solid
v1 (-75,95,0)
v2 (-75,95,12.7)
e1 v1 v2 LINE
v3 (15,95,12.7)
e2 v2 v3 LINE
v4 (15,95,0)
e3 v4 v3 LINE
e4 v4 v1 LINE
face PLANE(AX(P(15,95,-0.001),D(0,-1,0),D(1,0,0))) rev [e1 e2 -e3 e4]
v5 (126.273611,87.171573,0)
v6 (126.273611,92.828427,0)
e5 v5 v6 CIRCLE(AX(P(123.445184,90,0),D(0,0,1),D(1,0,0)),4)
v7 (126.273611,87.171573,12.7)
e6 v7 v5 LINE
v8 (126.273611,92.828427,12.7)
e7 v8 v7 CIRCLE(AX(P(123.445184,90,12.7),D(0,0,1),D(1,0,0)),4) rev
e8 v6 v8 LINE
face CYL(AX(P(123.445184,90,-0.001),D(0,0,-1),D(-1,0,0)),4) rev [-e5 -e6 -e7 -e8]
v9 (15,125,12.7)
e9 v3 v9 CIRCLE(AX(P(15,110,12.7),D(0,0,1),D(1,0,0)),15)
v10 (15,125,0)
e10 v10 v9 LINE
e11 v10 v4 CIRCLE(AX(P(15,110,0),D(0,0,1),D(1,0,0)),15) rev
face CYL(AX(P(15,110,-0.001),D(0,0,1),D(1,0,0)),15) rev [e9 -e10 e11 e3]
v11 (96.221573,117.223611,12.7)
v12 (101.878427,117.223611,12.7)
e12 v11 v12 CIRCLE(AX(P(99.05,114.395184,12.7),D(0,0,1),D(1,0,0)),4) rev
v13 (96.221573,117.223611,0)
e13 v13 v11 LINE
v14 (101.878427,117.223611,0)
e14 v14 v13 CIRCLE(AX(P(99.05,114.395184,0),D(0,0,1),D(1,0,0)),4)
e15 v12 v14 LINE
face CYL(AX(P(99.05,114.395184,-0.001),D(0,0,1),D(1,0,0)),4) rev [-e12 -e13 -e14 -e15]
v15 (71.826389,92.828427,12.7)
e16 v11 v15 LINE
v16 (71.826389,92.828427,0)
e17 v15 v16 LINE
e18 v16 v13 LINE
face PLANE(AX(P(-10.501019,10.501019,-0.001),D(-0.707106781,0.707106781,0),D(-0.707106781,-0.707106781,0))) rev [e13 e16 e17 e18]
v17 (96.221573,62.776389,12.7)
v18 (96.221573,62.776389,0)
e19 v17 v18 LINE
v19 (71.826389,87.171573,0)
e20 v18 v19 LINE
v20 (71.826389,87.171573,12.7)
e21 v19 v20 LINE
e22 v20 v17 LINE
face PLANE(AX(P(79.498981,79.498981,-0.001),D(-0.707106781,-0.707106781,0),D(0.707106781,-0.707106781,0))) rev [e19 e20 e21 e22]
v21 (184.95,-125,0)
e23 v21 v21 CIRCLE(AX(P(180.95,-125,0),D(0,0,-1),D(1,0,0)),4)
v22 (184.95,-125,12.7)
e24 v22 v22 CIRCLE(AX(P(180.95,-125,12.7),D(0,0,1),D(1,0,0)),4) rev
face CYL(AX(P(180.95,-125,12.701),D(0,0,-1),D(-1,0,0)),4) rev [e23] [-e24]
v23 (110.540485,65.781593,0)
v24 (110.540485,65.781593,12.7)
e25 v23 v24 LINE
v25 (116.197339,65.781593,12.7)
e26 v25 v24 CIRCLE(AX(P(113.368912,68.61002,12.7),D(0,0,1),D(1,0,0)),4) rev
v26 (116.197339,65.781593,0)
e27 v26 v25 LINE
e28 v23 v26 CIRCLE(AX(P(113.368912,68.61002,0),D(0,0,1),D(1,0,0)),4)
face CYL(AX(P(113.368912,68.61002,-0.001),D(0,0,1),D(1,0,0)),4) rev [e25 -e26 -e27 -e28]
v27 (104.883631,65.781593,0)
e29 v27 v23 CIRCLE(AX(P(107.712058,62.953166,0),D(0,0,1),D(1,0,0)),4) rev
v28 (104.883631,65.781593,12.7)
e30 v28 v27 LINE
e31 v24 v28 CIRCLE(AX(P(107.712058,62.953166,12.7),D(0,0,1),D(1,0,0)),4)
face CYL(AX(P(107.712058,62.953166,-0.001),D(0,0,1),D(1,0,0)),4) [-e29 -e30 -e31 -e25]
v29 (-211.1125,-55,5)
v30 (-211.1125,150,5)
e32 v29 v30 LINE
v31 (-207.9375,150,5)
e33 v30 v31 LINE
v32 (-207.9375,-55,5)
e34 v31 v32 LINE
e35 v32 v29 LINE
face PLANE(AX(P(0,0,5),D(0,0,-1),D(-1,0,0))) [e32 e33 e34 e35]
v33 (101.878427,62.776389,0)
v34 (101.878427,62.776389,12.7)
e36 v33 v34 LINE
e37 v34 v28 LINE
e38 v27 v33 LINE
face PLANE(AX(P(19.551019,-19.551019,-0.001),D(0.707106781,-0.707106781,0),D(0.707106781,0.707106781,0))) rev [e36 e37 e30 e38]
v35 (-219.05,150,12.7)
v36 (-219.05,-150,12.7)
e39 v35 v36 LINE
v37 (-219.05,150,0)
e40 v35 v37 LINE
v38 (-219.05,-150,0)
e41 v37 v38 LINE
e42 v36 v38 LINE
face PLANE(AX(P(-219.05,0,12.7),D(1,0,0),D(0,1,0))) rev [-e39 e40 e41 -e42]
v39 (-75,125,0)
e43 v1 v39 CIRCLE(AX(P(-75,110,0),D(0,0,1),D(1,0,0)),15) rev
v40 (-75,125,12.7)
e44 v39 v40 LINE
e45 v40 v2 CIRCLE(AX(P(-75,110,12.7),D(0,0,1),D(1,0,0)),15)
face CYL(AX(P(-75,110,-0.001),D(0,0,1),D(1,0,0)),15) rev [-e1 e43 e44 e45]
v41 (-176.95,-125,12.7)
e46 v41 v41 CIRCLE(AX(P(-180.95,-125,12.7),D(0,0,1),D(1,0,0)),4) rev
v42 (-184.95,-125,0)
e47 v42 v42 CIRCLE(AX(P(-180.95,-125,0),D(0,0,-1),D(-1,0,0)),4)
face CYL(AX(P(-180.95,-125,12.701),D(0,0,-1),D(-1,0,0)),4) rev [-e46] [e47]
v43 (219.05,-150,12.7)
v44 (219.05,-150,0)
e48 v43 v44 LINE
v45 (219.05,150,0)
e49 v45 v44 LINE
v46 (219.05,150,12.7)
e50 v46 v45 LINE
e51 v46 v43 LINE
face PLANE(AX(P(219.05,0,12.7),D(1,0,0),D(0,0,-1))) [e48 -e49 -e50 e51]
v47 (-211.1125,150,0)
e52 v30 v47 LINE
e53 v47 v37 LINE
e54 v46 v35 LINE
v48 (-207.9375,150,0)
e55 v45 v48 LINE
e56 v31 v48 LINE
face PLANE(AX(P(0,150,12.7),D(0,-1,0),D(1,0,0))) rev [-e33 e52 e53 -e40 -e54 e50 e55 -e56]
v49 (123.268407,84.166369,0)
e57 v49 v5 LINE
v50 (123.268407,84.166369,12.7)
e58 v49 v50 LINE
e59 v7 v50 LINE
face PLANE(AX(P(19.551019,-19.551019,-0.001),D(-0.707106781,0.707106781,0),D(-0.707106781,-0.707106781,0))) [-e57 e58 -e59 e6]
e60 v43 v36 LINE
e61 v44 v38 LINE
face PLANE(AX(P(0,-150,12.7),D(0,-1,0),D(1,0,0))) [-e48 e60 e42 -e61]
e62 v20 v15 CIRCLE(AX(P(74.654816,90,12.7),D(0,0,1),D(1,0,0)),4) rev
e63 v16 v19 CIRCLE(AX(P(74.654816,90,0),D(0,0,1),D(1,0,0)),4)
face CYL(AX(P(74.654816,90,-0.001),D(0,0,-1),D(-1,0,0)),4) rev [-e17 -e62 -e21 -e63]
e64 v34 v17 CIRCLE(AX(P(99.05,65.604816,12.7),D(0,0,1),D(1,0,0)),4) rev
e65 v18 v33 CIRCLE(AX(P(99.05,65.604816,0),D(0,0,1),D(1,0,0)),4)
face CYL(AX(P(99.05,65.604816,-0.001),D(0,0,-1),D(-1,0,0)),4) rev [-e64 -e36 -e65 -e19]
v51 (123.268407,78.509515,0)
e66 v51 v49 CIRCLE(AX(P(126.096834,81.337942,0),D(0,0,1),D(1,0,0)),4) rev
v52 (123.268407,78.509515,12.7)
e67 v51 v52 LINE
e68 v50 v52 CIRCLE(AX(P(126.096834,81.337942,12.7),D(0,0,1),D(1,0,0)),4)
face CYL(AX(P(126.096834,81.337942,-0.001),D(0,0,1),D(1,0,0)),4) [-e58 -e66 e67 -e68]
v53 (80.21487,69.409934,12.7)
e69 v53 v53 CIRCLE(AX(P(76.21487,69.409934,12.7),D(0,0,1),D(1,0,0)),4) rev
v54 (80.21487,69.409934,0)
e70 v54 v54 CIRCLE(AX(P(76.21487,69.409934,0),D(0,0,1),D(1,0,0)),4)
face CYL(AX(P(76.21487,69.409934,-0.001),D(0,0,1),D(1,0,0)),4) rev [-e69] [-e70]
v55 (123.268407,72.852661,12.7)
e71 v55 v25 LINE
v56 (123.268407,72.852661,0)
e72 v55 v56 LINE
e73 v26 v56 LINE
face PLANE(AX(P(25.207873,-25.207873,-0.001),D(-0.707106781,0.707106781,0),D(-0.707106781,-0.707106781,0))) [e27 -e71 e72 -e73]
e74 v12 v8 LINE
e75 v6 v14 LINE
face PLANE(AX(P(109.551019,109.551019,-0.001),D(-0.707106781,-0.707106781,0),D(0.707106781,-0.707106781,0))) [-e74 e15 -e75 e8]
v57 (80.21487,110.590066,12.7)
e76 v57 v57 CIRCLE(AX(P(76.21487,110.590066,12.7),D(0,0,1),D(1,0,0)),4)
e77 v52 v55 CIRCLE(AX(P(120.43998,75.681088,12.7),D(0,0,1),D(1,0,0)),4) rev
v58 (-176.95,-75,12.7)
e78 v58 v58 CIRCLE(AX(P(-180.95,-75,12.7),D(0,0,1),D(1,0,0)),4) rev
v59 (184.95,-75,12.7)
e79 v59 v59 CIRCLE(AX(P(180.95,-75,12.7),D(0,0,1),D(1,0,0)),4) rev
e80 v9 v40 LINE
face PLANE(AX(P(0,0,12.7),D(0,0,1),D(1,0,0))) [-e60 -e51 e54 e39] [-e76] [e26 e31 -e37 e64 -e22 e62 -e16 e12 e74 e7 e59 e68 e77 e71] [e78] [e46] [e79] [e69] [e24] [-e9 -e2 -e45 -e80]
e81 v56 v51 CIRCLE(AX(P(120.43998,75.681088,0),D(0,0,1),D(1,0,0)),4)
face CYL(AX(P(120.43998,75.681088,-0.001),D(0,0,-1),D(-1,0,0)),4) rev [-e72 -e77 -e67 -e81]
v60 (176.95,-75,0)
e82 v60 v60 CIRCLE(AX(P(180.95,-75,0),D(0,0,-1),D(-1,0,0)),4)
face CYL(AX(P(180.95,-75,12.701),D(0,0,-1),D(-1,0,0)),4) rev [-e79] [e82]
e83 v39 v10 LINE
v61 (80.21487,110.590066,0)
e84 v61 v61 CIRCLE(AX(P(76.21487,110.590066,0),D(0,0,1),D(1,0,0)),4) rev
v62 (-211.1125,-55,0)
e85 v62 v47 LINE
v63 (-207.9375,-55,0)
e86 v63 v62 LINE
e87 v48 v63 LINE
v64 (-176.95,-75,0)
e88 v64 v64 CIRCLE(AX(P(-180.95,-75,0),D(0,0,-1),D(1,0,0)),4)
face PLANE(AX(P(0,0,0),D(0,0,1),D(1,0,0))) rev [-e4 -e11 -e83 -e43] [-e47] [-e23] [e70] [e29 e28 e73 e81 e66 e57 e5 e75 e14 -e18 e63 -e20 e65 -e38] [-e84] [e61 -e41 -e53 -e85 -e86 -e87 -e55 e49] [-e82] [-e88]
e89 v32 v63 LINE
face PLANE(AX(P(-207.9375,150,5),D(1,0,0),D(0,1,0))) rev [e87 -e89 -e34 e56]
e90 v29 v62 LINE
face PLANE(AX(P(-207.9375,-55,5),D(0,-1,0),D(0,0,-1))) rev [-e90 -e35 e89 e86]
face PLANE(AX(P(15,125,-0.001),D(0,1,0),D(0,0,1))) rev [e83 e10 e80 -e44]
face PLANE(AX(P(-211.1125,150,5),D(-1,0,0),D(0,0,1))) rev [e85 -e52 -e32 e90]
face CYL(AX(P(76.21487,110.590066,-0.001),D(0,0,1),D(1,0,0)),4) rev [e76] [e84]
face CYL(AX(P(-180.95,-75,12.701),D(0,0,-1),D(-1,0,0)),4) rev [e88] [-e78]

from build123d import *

# Parameters (mm, degrees)
SKETCH1_W           = 438.1
SKETCH1_H           = 300
BOSS_EXTRUDE1_DEPTH = 12.7
CUT_EXTRUDE1_REACH  = 267.79
SKETCH2_R           = 4
FILLET1_R           = 4
SKETCH3_W           = 3.175
SKETCH3_H           = 205
CUT_EXTRUDE2_DEPTH  = 5
CUT_EXTRUDE3_REACH  = 267.79
SKETCH4_R           = 4
CUT_EXTRUDE4_REACH  = 267.79


with BuildPart() as part:
    # Sketch1 → Boss-Extrude1 (new body)
    with BuildSketch(Plane.XY):
        Rectangle(SKETCH1_W, SKETCH1_H)
    extrude(amount=BOSS_EXTRUDE1_DEPTH)

    # Sketch2 → Cut-Extrude1 (cut, up to next)
    with BuildSketch(Plane.XY.offset(12.7), mode=Mode.PRIVATE) as cut_extrude1_sk1:
        with Locations((76.214870385, 110.590065585)):
            Circle(SKETCH2_R)
    cut_extrude1_tool1 = extrude(cut_extrude1_sk1.sketch, amount=-CUT_EXTRUDE1_REACH, mode=Mode.PRIVATE) & part.part
    # Sketch2 → Cut-Extrude1 (cut, up to next)
    with BuildSketch(Plane.XY.offset(12.7), mode=Mode.PRIVATE) as cut_extrude1_sk2:
        with Locations((76.214870385, 69.409934415)):
            Circle(SKETCH2_R)
    cut_extrude1_tool2 = extrude(cut_extrude1_sk2.sketch, amount=-CUT_EXTRUDE1_REACH, mode=Mode.PRIVATE) & part.part
    # Sketch2 → Cut-Extrude1 (cut, up to next)
    with BuildSketch(Plane.XY.offset(12.7), mode=Mode.PRIVATE) as cut_extrude1_sk3:
        Polygon((99.05, 120.0520382), (68.9979618, 90), (99.05, 59.9479618), (107.71205807, 68.610019869), (113.368912319, 62.95316562), (126.09683438, 75.681087681), (120.439980131, 81.33794193), (129.1020382, 90), align=None)
    cut_extrude1_tool3 = extrude(cut_extrude1_sk3.sketch, amount=-CUT_EXTRUDE1_REACH, mode=Mode.PRIVATE) & part.part
    add(cut_extrude1_tool1.solids().sort_by_distance((76.21487, 110.590066, 12.7))[0], mode=Mode.SUBTRACT)
    add(cut_extrude1_tool2.solids().sort_by_distance((76.21487, 69.409934, 12.7))[0], mode=Mode.SUBTRACT)
    add(cut_extrude1_tool3.solids().sort_by_distance((100.368313, 88.681687, 12.7))[0], mode=Mode.SUBTRACT)

    # Fillet1
    fillet1_edges = [part.edges().sort_by_distance(p)[0] for p in [
        (99.05, 120.0520382, 6.35),
        (68.9979618, 90, 6.35),
        (120.439980131, 81.33794193, 6.35),
        (126.09683438, 75.681087681, 6.35),
        (113.368912319, 62.95316562, 6.35),
        (107.71205807, 68.610019869, 6.35),
        (99.05, 59.9479618, 6.35),
        (129.1020382, 90, 6.35),
    ]]
    fillet(fillet1_edges, radius=FILLET1_R - 0.0001)  # a hair under: the kernel refuses the full size

    # Sketch3 → Cut-Extrude2 (cut)
    with BuildSketch(Plane(origin=(0, 0, 0), x_dir=(-1, 0, 0), z_dir=(0, 0, -1))):
        with Locations((209.525, 47.5)):
            Rectangle(SKETCH3_W, SKETCH3_H)
    extrude(amount=-CUT_EXTRUDE2_DEPTH, mode=Mode.SUBTRACT)

    # Sketch4 → Cut-Extrude3 (cut, up to next)
    with BuildSketch(Plane(origin=(0, 0, 0), x_dir=(-1, 0, 0), z_dir=(0, 0, -1)), mode=Mode.PRIVATE) as cut_extrude3_sk1:
        with Locations((-180.95, -75)):
            Circle(SKETCH4_R)
    cut_extrude3_tool1 = extrude(cut_extrude3_sk1.sketch, amount=-CUT_EXTRUDE3_REACH, mode=Mode.PRIVATE) & part.part
    # Sketch4 → Cut-Extrude3 (cut, up to next)
    with BuildSketch(Plane(origin=(0, 0, 0), x_dir=(-1, 0, 0), z_dir=(0, 0, -1)), mode=Mode.PRIVATE) as cut_extrude3_sk2:
        with Locations(Location((-180.95, -125, 0), (0, 0, 180))):
            Circle(SKETCH4_R)
    cut_extrude3_tool2 = extrude(cut_extrude3_sk2.sketch, amount=-CUT_EXTRUDE3_REACH, mode=Mode.PRIVATE) & part.part
    # Sketch4 → Cut-Extrude3 (cut, up to next)
    with BuildSketch(Plane(origin=(0, 0, 0), x_dir=(-1, 0, 0), z_dir=(0, 0, -1)), mode=Mode.PRIVATE) as cut_extrude3_sk3:
        with Locations((180.95, -125)):
            Circle(SKETCH4_R)
    cut_extrude3_tool3 = extrude(cut_extrude3_sk3.sketch, amount=-CUT_EXTRUDE3_REACH, mode=Mode.PRIVATE) & part.part
    # Sketch4 → Cut-Extrude3 (cut, up to next)
    with BuildSketch(Plane(origin=(0, 0, 0), x_dir=(-1, 0, 0), z_dir=(0, 0, -1)), mode=Mode.PRIVATE) as cut_extrude3_sk4:
        with Locations(Location((180.95, -75, 0), (0, 0, 180))):
            Circle(SKETCH4_R)
    cut_extrude3_tool4 = extrude(cut_extrude3_sk4.sketch, amount=-CUT_EXTRUDE3_REACH, mode=Mode.PRIVATE) & part.part
    add(cut_extrude3_tool1.solids().sort_by_distance((180.95, -75, 0))[0], mode=Mode.SUBTRACT)
    add(cut_extrude3_tool2.solids().sort_by_distance((180.95, -125, 0))[0], mode=Mode.SUBTRACT)
    add(cut_extrude3_tool3.solids().sort_by_distance((-180.95, -125, 0))[0], mode=Mode.SUBTRACT)
    add(cut_extrude3_tool4.solids().sort_by_distance((-180.95, -75, 0))[0], mode=Mode.SUBTRACT)

    # Sketch5 → Cut-Extrude4 (cut, up to next)
    with BuildSketch(Plane.XY.offset(12.7), mode=Mode.PRIVATE) as cut_extrude4_sk1:
        with BuildLine():
            Line((15, 95), (-75, 95))
            ThreePointArc((-75, 95), (-90, 110), (-75, 125))
            Line((-75, 125), (15, 125))
            ThreePointArc((15, 125), (30, 110), (15, 95))
        make_face()
    cut_extrude4_tool1 = extrude(cut_extrude4_sk1.sketch, amount=-CUT_EXTRUDE4_REACH, mode=Mode.PRIVATE) & part.part
    add(cut_extrude4_tool1.solids().sort_by_distance((-30, 110, 12.7))[0], mode=Mode.SUBTRACT)


solid = part.part
